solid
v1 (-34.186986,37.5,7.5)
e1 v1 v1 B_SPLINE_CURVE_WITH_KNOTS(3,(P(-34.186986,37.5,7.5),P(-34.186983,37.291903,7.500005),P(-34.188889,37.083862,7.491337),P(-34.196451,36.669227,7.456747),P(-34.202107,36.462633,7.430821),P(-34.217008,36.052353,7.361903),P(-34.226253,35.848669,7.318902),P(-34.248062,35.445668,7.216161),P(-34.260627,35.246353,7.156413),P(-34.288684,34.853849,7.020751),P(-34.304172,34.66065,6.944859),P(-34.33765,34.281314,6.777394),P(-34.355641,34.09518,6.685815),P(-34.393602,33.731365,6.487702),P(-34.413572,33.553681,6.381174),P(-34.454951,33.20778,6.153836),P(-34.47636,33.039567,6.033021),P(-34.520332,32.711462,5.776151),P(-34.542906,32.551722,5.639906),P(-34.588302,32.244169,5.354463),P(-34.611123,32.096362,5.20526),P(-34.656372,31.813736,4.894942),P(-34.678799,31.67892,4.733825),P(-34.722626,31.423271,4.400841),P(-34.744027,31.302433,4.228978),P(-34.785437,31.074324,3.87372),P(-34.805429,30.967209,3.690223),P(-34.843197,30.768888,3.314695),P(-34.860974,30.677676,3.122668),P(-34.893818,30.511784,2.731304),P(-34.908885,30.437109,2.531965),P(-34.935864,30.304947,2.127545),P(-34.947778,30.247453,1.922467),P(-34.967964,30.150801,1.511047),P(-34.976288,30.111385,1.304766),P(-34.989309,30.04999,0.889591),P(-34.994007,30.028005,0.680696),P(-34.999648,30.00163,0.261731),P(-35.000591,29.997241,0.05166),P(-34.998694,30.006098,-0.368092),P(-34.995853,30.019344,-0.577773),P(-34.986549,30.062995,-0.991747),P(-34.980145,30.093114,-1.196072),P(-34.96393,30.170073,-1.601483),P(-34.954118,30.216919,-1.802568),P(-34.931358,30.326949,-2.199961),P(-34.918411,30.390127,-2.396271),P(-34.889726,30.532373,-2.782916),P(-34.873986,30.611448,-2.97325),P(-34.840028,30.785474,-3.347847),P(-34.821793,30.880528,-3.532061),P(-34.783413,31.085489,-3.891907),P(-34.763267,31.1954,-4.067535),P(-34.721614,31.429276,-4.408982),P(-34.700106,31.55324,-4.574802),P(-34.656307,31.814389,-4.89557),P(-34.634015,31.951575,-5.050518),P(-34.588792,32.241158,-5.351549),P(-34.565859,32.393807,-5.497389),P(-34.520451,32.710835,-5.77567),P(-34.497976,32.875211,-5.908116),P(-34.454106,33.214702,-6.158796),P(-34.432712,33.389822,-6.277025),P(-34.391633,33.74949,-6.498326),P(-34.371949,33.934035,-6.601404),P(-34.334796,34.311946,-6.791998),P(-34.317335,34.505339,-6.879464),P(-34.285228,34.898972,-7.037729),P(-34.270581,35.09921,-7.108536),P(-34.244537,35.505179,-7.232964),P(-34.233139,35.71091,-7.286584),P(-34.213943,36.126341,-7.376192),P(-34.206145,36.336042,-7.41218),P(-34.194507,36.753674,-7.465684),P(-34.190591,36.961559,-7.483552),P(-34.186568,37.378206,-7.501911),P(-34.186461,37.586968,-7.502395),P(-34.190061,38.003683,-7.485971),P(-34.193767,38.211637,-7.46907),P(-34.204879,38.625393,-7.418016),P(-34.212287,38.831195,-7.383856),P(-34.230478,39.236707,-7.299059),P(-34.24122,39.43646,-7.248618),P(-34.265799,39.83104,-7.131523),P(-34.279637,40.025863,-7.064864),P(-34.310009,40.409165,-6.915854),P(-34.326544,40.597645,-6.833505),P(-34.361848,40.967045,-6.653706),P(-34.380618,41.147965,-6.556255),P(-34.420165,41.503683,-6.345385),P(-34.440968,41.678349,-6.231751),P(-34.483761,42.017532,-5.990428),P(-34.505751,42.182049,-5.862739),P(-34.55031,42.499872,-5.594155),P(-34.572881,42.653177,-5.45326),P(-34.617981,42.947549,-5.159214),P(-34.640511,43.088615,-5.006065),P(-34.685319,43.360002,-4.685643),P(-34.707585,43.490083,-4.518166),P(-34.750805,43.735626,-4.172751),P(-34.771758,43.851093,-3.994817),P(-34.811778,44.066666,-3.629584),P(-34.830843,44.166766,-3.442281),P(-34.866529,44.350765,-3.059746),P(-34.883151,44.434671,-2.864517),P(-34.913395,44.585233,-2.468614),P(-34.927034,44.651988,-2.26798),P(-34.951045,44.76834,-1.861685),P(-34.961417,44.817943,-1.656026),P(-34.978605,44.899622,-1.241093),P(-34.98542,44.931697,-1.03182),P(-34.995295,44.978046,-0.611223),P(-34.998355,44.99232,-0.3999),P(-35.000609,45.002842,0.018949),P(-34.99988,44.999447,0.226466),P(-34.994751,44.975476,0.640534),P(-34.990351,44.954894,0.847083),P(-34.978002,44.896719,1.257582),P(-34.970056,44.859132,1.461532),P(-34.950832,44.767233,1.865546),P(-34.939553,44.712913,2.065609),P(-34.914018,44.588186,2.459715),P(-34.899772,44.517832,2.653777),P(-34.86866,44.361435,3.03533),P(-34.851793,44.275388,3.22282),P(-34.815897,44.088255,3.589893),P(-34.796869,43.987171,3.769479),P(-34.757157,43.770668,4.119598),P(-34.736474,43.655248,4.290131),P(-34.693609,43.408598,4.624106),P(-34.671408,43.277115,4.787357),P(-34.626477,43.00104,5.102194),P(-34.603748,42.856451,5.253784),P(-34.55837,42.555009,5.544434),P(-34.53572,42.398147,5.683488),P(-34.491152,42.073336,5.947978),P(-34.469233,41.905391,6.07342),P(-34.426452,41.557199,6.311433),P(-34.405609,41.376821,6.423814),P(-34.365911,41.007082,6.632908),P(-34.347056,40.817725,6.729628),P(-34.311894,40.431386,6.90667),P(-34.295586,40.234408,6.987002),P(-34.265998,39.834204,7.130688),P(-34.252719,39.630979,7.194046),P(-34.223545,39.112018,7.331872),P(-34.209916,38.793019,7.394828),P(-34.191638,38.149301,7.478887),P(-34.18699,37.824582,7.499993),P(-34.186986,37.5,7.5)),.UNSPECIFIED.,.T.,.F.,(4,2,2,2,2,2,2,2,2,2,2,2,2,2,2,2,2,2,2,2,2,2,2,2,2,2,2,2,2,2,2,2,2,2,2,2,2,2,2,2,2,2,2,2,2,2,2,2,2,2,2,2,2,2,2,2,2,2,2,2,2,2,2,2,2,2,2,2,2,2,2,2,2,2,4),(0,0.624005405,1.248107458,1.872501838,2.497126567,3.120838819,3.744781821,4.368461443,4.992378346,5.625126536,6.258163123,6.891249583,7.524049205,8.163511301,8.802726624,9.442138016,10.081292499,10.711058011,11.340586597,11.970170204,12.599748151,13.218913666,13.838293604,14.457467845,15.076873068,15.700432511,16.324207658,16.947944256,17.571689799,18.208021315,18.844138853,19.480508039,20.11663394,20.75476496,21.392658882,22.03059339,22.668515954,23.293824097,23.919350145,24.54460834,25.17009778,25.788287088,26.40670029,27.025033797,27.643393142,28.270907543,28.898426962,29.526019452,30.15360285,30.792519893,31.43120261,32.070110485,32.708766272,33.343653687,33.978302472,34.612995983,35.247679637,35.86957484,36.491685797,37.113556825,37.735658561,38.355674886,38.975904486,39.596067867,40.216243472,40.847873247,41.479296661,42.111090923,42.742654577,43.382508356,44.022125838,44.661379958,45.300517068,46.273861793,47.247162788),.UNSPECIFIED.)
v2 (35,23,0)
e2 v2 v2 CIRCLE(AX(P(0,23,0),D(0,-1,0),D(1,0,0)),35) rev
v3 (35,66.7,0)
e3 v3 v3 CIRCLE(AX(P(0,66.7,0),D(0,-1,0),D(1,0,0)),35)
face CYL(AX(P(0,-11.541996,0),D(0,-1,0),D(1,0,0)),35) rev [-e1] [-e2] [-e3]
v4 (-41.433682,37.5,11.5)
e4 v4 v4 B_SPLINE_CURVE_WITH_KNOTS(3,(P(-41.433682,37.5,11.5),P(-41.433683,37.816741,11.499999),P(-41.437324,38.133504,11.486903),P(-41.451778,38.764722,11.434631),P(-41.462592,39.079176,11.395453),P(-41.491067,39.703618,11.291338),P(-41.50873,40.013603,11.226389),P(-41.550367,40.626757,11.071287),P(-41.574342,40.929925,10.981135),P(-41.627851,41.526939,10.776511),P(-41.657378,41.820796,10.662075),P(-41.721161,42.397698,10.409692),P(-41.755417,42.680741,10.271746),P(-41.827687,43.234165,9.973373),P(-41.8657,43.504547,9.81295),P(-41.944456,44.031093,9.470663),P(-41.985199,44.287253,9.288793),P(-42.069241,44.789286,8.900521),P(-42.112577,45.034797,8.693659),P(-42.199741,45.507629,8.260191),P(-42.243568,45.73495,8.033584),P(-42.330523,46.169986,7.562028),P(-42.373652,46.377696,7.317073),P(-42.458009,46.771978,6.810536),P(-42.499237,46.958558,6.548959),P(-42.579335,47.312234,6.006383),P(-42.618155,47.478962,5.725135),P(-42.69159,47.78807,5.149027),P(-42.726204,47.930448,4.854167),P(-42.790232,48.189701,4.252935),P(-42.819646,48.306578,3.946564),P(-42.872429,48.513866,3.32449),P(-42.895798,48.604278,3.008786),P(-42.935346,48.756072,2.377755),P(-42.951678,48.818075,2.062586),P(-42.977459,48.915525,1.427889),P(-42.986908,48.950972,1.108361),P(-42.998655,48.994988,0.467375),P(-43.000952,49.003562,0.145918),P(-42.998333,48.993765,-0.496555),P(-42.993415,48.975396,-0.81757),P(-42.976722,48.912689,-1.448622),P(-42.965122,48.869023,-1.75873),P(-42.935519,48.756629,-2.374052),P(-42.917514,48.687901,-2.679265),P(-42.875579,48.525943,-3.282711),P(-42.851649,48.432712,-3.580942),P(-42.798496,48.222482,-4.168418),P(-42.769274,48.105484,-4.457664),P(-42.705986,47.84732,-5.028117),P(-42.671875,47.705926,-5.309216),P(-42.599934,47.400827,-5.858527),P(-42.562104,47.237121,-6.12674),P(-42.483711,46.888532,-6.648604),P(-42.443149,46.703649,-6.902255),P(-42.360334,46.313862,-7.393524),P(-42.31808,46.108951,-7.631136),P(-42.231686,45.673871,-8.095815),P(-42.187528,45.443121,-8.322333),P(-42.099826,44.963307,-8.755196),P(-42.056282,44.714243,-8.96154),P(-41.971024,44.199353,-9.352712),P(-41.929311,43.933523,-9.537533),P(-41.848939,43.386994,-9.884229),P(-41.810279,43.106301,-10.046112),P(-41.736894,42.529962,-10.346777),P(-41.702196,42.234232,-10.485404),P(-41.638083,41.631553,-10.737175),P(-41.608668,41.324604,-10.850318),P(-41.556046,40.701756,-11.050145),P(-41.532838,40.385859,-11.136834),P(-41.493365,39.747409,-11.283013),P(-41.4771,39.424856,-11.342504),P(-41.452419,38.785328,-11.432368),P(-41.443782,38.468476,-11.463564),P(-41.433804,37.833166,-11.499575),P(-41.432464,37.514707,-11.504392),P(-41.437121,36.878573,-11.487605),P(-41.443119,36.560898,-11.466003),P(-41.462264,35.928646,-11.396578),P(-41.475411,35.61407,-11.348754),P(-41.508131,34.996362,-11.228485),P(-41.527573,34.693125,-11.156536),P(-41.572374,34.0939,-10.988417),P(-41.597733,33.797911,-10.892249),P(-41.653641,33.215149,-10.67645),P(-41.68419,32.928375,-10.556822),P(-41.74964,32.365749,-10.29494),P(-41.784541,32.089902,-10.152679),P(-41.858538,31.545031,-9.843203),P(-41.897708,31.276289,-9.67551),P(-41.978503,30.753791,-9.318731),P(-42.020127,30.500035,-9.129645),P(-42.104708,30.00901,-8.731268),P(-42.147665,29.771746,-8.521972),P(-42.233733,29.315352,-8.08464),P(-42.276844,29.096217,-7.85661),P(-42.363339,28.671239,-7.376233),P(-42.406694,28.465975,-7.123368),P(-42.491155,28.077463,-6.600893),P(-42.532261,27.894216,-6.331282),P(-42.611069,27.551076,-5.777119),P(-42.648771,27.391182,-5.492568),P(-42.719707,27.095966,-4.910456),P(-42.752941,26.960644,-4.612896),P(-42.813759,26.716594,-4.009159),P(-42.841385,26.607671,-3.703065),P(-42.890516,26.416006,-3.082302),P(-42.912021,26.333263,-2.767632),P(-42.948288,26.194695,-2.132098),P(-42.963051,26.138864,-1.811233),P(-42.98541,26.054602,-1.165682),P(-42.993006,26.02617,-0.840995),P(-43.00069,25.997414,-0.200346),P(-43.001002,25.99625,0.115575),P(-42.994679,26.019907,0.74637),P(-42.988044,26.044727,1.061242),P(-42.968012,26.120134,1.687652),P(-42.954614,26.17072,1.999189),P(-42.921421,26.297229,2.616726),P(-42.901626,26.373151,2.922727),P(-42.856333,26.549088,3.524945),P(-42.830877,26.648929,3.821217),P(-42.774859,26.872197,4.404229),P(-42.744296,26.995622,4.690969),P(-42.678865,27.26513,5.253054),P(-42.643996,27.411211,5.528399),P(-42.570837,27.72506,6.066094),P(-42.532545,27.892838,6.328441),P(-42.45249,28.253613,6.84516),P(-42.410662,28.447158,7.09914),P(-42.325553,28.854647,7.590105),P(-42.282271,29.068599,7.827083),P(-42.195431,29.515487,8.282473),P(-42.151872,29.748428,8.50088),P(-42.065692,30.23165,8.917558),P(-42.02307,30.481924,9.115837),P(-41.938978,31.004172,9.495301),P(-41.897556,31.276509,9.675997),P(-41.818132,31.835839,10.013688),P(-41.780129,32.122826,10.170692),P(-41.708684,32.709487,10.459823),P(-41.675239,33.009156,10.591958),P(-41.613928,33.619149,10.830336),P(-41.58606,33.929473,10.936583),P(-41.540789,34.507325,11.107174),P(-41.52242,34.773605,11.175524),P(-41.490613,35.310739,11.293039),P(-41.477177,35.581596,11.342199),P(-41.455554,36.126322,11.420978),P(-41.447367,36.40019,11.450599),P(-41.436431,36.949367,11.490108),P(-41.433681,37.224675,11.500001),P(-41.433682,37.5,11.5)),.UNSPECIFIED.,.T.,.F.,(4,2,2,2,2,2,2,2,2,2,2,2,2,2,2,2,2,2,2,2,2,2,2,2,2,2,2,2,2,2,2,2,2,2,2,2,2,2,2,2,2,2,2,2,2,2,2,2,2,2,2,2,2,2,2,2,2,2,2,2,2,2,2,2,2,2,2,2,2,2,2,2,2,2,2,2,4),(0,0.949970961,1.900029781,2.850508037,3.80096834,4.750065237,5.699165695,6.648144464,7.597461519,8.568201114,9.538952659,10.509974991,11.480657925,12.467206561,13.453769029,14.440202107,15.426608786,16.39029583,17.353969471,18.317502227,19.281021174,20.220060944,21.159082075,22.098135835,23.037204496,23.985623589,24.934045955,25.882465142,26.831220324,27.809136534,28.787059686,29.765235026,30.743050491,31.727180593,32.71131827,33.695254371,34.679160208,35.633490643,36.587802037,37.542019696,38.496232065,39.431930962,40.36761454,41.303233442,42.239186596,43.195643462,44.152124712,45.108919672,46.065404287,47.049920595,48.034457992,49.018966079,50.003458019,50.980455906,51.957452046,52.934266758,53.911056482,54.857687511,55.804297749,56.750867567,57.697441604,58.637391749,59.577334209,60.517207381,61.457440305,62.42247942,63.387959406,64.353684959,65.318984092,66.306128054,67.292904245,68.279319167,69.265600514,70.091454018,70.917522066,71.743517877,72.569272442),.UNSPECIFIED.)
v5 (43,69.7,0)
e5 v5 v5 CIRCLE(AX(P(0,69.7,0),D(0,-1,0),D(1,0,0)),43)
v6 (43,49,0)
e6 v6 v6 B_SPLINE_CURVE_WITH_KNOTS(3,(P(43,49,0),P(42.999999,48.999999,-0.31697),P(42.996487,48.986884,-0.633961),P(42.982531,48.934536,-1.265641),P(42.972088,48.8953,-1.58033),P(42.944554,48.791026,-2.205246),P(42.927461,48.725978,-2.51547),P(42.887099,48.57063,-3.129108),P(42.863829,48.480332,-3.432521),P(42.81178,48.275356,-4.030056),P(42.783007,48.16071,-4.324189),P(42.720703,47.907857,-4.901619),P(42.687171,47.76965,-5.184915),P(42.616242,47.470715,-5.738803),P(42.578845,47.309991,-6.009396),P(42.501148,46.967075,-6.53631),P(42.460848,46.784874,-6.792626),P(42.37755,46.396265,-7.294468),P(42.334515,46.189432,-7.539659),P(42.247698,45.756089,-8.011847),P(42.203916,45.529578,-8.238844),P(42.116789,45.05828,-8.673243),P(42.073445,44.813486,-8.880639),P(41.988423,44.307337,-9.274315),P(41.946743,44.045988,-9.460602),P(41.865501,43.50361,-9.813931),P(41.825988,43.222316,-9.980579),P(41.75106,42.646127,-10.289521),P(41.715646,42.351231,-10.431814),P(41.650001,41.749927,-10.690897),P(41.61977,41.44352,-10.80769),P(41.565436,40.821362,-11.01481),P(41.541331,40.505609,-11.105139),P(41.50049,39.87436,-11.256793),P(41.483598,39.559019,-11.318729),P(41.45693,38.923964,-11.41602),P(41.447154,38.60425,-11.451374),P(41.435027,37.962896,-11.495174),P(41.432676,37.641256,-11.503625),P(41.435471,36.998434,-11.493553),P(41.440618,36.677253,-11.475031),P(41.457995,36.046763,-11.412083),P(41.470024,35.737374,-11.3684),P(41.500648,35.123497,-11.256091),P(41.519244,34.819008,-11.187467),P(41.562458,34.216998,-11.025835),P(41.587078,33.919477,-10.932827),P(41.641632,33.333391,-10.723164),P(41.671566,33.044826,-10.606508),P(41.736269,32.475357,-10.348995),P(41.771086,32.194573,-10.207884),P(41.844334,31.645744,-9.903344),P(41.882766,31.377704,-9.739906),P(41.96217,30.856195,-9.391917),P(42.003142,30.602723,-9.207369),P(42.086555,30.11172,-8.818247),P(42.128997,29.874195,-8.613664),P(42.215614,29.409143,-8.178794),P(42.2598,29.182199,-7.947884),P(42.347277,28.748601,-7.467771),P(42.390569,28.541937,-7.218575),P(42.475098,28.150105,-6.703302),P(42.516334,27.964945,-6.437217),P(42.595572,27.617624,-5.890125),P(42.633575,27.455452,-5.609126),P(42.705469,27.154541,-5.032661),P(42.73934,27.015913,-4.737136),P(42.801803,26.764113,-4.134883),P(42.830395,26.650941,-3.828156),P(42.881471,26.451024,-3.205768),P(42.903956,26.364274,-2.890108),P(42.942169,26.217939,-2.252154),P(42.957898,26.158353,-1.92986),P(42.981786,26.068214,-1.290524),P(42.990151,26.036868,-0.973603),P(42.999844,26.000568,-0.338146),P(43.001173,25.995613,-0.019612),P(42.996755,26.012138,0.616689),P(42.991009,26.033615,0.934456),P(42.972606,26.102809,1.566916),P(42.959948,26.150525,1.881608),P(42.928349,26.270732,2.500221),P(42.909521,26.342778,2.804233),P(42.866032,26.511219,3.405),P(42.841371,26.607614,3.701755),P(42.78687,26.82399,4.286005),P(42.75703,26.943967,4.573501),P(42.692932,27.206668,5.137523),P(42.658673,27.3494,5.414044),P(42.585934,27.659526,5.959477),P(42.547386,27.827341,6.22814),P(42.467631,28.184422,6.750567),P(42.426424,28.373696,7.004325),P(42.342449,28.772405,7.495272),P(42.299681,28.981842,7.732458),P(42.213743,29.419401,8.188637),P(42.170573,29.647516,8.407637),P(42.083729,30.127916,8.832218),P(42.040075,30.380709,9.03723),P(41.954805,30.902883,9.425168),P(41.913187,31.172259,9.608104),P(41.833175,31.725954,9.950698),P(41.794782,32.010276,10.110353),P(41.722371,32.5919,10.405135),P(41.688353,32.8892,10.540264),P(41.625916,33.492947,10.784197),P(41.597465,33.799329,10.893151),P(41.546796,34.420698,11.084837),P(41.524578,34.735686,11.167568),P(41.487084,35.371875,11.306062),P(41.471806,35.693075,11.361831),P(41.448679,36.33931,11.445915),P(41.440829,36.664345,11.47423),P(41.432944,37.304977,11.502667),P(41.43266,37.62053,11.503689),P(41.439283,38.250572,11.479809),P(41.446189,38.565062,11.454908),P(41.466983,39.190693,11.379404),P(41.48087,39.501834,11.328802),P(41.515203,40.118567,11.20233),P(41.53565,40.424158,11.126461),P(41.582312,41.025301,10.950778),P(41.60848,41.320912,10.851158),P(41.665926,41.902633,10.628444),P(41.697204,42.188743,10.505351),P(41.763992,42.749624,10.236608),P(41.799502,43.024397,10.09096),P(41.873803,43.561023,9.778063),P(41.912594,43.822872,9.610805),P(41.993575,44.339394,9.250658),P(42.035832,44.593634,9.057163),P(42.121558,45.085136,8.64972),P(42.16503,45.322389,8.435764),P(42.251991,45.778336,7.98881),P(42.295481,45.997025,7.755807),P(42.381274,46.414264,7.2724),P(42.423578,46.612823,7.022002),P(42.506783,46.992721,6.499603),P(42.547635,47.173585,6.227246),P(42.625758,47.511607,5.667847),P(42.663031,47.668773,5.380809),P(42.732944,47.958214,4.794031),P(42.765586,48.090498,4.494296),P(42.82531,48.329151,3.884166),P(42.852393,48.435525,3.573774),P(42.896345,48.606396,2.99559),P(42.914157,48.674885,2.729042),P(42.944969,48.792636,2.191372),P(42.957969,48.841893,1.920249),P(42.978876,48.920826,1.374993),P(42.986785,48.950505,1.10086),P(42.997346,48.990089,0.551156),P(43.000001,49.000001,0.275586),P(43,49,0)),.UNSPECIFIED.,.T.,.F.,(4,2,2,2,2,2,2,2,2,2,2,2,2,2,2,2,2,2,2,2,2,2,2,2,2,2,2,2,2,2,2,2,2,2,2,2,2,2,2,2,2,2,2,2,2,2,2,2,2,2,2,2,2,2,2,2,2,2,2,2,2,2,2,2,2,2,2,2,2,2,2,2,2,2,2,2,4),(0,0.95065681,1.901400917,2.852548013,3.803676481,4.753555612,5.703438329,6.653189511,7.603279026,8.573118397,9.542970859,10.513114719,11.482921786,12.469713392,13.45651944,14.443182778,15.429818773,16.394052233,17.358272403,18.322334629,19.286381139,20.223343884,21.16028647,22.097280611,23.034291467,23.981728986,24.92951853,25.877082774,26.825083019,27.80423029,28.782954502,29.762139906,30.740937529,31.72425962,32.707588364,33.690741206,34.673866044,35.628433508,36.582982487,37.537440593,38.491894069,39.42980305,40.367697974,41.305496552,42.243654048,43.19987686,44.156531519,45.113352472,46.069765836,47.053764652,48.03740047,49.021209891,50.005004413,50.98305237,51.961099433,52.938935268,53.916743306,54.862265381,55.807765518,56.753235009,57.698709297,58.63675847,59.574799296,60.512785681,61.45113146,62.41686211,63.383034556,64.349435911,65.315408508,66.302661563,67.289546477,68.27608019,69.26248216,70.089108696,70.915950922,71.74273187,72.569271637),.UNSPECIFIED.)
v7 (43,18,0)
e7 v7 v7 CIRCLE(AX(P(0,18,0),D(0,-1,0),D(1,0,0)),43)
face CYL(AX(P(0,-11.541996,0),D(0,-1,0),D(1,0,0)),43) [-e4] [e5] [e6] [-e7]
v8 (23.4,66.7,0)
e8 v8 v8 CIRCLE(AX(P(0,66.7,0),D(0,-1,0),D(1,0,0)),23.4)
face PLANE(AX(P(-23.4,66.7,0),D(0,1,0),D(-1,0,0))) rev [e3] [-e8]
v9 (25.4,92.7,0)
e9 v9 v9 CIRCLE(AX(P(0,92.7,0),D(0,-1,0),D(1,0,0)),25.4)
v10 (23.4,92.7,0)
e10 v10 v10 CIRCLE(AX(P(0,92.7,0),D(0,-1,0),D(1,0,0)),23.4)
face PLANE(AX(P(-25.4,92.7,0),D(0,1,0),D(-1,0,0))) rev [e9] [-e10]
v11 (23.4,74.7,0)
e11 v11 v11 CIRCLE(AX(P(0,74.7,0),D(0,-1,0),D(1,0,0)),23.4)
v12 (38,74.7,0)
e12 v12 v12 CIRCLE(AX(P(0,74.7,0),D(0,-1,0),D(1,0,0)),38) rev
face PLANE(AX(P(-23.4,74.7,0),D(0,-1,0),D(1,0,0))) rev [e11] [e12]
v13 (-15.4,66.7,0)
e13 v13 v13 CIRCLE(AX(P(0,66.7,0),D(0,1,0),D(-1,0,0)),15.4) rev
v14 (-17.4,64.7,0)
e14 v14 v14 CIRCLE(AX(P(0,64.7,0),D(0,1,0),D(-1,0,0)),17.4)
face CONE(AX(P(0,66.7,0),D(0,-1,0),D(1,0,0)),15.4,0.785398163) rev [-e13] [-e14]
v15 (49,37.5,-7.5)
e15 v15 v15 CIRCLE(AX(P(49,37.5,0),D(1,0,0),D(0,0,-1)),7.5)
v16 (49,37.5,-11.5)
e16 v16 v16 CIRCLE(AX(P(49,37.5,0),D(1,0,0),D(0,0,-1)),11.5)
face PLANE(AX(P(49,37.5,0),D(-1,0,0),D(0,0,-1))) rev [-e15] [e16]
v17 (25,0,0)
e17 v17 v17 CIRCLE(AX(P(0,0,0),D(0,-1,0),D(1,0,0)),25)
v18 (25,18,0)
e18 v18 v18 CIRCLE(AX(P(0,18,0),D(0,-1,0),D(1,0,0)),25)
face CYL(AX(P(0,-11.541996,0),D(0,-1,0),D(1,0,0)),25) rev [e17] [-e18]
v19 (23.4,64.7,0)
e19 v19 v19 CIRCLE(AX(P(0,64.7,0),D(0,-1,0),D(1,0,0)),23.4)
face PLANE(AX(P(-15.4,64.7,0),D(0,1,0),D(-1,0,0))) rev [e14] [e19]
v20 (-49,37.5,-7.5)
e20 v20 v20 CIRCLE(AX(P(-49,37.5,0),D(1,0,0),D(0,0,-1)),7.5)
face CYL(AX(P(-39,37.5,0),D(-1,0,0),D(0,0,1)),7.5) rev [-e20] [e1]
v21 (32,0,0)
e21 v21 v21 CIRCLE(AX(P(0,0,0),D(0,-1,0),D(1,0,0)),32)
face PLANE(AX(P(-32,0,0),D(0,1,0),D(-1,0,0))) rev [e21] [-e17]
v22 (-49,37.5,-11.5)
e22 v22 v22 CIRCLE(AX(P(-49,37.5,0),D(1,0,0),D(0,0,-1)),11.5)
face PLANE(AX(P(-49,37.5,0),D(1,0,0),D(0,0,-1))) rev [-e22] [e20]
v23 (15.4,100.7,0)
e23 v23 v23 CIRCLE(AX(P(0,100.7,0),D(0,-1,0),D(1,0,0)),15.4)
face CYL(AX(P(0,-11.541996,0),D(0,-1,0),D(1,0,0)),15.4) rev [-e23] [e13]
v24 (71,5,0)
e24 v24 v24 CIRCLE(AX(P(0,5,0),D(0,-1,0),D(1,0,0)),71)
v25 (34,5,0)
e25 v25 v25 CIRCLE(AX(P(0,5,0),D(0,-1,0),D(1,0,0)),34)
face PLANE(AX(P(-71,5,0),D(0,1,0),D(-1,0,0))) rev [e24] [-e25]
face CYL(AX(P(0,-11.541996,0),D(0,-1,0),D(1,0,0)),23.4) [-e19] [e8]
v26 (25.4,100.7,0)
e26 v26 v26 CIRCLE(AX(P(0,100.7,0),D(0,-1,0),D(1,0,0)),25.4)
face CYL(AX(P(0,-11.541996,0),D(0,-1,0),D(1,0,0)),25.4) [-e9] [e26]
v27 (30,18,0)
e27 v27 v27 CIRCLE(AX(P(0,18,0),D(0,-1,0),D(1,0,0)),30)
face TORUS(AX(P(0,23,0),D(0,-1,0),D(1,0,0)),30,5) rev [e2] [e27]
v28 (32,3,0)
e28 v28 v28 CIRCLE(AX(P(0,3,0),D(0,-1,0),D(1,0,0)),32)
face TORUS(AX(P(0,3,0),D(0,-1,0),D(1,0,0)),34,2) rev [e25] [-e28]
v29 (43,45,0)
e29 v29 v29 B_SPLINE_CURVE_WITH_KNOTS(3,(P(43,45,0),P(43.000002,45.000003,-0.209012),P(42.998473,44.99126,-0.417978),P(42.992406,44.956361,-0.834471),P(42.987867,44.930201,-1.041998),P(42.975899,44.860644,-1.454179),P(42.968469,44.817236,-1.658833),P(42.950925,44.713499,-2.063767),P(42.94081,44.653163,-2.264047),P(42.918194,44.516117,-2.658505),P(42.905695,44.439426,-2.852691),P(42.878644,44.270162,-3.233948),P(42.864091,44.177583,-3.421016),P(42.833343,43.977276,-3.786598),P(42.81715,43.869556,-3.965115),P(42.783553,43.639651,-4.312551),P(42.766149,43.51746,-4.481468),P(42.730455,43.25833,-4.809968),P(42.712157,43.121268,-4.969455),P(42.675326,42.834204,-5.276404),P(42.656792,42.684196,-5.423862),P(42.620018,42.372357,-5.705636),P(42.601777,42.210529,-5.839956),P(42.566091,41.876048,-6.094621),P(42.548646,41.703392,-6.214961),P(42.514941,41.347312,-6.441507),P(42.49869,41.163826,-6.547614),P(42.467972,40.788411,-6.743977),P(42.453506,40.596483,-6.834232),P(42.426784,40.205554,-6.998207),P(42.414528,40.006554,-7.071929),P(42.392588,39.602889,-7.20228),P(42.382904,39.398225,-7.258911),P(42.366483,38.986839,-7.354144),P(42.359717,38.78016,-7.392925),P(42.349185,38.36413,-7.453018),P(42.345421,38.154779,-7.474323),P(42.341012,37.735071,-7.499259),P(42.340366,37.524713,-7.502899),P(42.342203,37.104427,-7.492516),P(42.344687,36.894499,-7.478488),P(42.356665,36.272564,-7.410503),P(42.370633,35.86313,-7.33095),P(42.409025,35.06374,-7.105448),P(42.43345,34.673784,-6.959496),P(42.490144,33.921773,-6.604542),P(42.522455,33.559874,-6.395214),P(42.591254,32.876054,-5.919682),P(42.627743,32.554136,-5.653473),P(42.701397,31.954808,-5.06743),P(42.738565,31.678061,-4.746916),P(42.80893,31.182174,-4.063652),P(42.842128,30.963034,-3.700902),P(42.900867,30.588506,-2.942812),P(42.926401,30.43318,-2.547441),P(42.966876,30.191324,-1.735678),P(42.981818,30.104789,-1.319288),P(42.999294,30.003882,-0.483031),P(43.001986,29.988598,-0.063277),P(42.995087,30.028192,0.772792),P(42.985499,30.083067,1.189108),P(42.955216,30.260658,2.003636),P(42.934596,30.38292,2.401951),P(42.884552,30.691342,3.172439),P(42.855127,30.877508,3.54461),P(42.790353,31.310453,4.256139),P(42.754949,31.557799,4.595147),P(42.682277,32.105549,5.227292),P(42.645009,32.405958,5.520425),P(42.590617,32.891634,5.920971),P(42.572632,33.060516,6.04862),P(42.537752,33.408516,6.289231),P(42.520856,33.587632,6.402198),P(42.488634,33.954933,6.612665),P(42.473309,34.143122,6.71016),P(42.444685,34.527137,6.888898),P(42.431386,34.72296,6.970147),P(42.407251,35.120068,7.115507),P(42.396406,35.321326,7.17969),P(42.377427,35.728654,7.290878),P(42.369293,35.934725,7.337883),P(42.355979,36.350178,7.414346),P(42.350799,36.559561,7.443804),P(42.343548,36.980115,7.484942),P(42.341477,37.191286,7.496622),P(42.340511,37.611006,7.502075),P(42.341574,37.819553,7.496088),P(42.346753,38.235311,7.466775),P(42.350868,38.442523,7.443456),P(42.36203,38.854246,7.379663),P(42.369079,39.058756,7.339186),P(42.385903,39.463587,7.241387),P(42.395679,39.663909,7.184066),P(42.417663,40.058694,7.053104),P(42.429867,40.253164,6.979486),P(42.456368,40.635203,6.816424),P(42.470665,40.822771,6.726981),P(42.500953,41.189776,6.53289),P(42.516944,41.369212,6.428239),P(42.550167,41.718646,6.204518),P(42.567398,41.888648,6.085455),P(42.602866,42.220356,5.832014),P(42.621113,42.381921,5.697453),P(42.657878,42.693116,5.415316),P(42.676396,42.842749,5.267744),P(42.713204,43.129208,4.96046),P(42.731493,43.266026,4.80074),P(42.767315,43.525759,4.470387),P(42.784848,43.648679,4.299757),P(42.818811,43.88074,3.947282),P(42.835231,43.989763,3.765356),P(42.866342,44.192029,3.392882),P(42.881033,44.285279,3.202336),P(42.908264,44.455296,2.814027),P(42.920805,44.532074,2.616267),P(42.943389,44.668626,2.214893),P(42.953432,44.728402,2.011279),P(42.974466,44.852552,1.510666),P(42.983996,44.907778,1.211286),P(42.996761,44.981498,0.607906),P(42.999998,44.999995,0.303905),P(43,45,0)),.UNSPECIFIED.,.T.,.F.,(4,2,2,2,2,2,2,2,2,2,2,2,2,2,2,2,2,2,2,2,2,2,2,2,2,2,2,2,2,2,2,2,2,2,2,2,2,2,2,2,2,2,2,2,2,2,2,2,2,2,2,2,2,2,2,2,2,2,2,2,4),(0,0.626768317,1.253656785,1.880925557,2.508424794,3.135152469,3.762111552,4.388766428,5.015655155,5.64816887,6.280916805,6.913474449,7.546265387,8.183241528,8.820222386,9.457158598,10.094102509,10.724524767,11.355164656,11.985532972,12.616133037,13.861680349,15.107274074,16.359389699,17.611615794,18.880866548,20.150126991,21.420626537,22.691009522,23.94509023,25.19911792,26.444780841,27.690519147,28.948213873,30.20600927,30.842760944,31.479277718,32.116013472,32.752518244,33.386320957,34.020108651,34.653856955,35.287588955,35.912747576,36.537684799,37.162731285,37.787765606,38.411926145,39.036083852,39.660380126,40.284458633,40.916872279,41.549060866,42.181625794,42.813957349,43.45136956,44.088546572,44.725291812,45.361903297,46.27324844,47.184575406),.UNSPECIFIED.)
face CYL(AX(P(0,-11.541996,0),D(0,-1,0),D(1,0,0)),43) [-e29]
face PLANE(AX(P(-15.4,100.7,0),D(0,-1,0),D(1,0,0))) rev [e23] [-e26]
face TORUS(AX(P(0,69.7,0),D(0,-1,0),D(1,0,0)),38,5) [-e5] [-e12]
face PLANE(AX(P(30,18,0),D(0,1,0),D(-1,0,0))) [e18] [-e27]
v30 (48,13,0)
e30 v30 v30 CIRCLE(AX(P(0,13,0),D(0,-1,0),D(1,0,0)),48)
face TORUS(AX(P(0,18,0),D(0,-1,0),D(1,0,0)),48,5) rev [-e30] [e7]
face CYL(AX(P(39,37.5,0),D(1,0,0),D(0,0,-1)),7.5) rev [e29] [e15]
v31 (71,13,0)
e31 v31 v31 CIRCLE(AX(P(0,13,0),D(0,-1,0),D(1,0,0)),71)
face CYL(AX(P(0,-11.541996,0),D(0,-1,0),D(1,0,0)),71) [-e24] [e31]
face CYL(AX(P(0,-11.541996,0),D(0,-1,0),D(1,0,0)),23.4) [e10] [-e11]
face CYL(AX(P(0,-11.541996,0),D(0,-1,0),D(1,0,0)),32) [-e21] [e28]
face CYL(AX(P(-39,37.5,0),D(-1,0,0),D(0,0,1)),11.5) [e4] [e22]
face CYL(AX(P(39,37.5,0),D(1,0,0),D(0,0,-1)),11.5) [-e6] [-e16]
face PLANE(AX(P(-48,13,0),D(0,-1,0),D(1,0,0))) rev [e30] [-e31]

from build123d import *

# Parameters (mm, degrees)
SKETCH2_R           = 11.5
SKETCH2_R_2         = 7.5
BOSS_EXTRUDE1_DEPTH = 10
SKETCH4_R           = 7.5
CUT_EXTRUDE4_DEPTH  = 34
FILLET1_R           = 5
CHAMFER1_SIZE       = 2


# Read off the part's stored shape, not the designer's step: Revolve1
with BuildPart() as part:
    # Revolve1 outline → Revolve1 (revolve)
    with BuildSketch(Plane.XY):
        with BuildLine():
            Line((35, 18), (30, 18))
            ThreePointArc((30, 18), (26.464466094, 16.535533906), (25, 13))
            Line((25, 13), (25, 0))
            Line((25, 0), (32, 0))
            Line((32, 0), (32, 3))
            ThreePointArc((32, 3), (32.585786438, 4.414213562), (34, 5))
            Line((34, 5), (71, 5))
            Line((71, 5), (71, 13))
            Line((71, 13), (48, 13))
            ThreePointArc((48, 13), (44.464466094, 14.464466094), (43, 18))
            Line((43, 18), (43, 74.7))
            Line((43, 74.7), (23.4, 74.7))
            Line((23.4, 74.7), (23.4, 92.7))
            Line((23.4, 92.7), (25.4, 92.7))
            Line((25.4, 92.7), (25.4, 100.7))
            Line((25.4, 100.7), (15.4, 100.7))
            Line((15.4, 100.7), (15.4, 64.7))
            Line((15.4, 64.7), (23.4, 64.7))
            Line((23.4, 64.7), (23.4, 66.7))
            Line((23.4, 66.7), (35, 66.7))
            Line((35, 66.7), (35, 18))
        make_face()
    revolve(axis=Axis((0, 0, 0), (0, 1, 0)))



with BuildPart() as body_2:
    # Revolve1 2 outline → Revolve1 2 (revolve)
    with BuildSketch(Plane.XY):
        with BuildLine():
            Line((15.4, 100.7), (15.4, 64.7))
            Line((15.4, 64.7), (23.4, 64.7))
            Line((23.4, 64.7), (23.4, 66.7))
            Line((23.4, 66.7), (35, 66.7))
            Line((35, 66.7), (35, 23))
            ThreePointArc((35, 23), (33.535533906, 19.464466094), (30, 18))
            Line((30, 18), (25, 18))
            Line((25, 18), (25, 0))
            Line((25, 0), (32, 0))
            Line((32, 0), (32, 3))
            ThreePointArc((32, 3), (32.585786438, 4.414213562), (34, 5))
            Line((34, 5), (71, 5))
            Line((71, 5), (71, 13))
            Line((71, 13), (48, 13))
            ThreePointArc((48, 13), (44.464466094, 14.464466094), (43, 18))
            Line((43, 18), (43, 74.7))
            Line((43, 74.7), (23.4, 74.7))
            Line((23.4, 74.7), (23.4, 92.7))
            Line((23.4, 92.7), (25.4, 92.7))
            Line((25.4, 92.7), (25.4, 100.7))
            Line((25.4, 100.7), (15.4, 100.7))
        make_face()
    revolve(axis=Axis((0, 0, 0), (0, 1, 0)))


with BuildPart() as part_1:
    add(part.part)

    add(body_2.part)  # Boss-Extrude1 merges body 2
    # Sketch2 → Boss-Extrude1 (add)
    with BuildSketch(Plane(origin=(-49, 0, 0), x_dir=(0, 0, -1), z_dir=(1, 0, 0))):
        with Locations(Location((0, 37.5, 0), (0, 0, 180))):
            Circle(SKETCH2_R)
        with Locations(Location((0, 37.5, 0), (0, 0, 180))):
            Circle(SKETCH2_R_2, mode=Mode.SUBTRACT)
    boss_extrude1 = extrude(amount=BOSS_EXTRUDE1_DEPTH)

    # Sketch4 → Cut-Extrude4 (cut)
    with BuildSketch(Plane(origin=(-49, 0, 0), x_dir=(0, 0, -1), z_dir=(1, 0, 0))):
        with Locations(Location((0, 37.5, 0), (0, 0, 180))):
            Circle(SKETCH4_R)
    extrude(amount=CUT_EXTRUDE4_DEPTH, mode=Mode.SUBTRACT)

    # Mirror1: Boss-Extrude1 across plane
    add(boss_extrude1.mirror(Plane(origin=(0, 0, 0), x_dir=(0, 0, 1), z_dir=(1, 0, 0))))

    # Fillet1
    fillet1_edges = [part_1.edges().sort_by_distance(p)[0] for p in [
        (-43, 74.7, 0),
    ]]
    fillet(fillet1_edges, radius=FILLET1_R)

    # Chamfer1
    chamfer1_edges = [part_1.edges().sort_by_distance(p)[0] for p in [
        (-15.4, 64.7, 0),
    ]]
    chamfer(chamfer1_edges, length=CHAMFER1_SIZE)


solid = part_1.part
